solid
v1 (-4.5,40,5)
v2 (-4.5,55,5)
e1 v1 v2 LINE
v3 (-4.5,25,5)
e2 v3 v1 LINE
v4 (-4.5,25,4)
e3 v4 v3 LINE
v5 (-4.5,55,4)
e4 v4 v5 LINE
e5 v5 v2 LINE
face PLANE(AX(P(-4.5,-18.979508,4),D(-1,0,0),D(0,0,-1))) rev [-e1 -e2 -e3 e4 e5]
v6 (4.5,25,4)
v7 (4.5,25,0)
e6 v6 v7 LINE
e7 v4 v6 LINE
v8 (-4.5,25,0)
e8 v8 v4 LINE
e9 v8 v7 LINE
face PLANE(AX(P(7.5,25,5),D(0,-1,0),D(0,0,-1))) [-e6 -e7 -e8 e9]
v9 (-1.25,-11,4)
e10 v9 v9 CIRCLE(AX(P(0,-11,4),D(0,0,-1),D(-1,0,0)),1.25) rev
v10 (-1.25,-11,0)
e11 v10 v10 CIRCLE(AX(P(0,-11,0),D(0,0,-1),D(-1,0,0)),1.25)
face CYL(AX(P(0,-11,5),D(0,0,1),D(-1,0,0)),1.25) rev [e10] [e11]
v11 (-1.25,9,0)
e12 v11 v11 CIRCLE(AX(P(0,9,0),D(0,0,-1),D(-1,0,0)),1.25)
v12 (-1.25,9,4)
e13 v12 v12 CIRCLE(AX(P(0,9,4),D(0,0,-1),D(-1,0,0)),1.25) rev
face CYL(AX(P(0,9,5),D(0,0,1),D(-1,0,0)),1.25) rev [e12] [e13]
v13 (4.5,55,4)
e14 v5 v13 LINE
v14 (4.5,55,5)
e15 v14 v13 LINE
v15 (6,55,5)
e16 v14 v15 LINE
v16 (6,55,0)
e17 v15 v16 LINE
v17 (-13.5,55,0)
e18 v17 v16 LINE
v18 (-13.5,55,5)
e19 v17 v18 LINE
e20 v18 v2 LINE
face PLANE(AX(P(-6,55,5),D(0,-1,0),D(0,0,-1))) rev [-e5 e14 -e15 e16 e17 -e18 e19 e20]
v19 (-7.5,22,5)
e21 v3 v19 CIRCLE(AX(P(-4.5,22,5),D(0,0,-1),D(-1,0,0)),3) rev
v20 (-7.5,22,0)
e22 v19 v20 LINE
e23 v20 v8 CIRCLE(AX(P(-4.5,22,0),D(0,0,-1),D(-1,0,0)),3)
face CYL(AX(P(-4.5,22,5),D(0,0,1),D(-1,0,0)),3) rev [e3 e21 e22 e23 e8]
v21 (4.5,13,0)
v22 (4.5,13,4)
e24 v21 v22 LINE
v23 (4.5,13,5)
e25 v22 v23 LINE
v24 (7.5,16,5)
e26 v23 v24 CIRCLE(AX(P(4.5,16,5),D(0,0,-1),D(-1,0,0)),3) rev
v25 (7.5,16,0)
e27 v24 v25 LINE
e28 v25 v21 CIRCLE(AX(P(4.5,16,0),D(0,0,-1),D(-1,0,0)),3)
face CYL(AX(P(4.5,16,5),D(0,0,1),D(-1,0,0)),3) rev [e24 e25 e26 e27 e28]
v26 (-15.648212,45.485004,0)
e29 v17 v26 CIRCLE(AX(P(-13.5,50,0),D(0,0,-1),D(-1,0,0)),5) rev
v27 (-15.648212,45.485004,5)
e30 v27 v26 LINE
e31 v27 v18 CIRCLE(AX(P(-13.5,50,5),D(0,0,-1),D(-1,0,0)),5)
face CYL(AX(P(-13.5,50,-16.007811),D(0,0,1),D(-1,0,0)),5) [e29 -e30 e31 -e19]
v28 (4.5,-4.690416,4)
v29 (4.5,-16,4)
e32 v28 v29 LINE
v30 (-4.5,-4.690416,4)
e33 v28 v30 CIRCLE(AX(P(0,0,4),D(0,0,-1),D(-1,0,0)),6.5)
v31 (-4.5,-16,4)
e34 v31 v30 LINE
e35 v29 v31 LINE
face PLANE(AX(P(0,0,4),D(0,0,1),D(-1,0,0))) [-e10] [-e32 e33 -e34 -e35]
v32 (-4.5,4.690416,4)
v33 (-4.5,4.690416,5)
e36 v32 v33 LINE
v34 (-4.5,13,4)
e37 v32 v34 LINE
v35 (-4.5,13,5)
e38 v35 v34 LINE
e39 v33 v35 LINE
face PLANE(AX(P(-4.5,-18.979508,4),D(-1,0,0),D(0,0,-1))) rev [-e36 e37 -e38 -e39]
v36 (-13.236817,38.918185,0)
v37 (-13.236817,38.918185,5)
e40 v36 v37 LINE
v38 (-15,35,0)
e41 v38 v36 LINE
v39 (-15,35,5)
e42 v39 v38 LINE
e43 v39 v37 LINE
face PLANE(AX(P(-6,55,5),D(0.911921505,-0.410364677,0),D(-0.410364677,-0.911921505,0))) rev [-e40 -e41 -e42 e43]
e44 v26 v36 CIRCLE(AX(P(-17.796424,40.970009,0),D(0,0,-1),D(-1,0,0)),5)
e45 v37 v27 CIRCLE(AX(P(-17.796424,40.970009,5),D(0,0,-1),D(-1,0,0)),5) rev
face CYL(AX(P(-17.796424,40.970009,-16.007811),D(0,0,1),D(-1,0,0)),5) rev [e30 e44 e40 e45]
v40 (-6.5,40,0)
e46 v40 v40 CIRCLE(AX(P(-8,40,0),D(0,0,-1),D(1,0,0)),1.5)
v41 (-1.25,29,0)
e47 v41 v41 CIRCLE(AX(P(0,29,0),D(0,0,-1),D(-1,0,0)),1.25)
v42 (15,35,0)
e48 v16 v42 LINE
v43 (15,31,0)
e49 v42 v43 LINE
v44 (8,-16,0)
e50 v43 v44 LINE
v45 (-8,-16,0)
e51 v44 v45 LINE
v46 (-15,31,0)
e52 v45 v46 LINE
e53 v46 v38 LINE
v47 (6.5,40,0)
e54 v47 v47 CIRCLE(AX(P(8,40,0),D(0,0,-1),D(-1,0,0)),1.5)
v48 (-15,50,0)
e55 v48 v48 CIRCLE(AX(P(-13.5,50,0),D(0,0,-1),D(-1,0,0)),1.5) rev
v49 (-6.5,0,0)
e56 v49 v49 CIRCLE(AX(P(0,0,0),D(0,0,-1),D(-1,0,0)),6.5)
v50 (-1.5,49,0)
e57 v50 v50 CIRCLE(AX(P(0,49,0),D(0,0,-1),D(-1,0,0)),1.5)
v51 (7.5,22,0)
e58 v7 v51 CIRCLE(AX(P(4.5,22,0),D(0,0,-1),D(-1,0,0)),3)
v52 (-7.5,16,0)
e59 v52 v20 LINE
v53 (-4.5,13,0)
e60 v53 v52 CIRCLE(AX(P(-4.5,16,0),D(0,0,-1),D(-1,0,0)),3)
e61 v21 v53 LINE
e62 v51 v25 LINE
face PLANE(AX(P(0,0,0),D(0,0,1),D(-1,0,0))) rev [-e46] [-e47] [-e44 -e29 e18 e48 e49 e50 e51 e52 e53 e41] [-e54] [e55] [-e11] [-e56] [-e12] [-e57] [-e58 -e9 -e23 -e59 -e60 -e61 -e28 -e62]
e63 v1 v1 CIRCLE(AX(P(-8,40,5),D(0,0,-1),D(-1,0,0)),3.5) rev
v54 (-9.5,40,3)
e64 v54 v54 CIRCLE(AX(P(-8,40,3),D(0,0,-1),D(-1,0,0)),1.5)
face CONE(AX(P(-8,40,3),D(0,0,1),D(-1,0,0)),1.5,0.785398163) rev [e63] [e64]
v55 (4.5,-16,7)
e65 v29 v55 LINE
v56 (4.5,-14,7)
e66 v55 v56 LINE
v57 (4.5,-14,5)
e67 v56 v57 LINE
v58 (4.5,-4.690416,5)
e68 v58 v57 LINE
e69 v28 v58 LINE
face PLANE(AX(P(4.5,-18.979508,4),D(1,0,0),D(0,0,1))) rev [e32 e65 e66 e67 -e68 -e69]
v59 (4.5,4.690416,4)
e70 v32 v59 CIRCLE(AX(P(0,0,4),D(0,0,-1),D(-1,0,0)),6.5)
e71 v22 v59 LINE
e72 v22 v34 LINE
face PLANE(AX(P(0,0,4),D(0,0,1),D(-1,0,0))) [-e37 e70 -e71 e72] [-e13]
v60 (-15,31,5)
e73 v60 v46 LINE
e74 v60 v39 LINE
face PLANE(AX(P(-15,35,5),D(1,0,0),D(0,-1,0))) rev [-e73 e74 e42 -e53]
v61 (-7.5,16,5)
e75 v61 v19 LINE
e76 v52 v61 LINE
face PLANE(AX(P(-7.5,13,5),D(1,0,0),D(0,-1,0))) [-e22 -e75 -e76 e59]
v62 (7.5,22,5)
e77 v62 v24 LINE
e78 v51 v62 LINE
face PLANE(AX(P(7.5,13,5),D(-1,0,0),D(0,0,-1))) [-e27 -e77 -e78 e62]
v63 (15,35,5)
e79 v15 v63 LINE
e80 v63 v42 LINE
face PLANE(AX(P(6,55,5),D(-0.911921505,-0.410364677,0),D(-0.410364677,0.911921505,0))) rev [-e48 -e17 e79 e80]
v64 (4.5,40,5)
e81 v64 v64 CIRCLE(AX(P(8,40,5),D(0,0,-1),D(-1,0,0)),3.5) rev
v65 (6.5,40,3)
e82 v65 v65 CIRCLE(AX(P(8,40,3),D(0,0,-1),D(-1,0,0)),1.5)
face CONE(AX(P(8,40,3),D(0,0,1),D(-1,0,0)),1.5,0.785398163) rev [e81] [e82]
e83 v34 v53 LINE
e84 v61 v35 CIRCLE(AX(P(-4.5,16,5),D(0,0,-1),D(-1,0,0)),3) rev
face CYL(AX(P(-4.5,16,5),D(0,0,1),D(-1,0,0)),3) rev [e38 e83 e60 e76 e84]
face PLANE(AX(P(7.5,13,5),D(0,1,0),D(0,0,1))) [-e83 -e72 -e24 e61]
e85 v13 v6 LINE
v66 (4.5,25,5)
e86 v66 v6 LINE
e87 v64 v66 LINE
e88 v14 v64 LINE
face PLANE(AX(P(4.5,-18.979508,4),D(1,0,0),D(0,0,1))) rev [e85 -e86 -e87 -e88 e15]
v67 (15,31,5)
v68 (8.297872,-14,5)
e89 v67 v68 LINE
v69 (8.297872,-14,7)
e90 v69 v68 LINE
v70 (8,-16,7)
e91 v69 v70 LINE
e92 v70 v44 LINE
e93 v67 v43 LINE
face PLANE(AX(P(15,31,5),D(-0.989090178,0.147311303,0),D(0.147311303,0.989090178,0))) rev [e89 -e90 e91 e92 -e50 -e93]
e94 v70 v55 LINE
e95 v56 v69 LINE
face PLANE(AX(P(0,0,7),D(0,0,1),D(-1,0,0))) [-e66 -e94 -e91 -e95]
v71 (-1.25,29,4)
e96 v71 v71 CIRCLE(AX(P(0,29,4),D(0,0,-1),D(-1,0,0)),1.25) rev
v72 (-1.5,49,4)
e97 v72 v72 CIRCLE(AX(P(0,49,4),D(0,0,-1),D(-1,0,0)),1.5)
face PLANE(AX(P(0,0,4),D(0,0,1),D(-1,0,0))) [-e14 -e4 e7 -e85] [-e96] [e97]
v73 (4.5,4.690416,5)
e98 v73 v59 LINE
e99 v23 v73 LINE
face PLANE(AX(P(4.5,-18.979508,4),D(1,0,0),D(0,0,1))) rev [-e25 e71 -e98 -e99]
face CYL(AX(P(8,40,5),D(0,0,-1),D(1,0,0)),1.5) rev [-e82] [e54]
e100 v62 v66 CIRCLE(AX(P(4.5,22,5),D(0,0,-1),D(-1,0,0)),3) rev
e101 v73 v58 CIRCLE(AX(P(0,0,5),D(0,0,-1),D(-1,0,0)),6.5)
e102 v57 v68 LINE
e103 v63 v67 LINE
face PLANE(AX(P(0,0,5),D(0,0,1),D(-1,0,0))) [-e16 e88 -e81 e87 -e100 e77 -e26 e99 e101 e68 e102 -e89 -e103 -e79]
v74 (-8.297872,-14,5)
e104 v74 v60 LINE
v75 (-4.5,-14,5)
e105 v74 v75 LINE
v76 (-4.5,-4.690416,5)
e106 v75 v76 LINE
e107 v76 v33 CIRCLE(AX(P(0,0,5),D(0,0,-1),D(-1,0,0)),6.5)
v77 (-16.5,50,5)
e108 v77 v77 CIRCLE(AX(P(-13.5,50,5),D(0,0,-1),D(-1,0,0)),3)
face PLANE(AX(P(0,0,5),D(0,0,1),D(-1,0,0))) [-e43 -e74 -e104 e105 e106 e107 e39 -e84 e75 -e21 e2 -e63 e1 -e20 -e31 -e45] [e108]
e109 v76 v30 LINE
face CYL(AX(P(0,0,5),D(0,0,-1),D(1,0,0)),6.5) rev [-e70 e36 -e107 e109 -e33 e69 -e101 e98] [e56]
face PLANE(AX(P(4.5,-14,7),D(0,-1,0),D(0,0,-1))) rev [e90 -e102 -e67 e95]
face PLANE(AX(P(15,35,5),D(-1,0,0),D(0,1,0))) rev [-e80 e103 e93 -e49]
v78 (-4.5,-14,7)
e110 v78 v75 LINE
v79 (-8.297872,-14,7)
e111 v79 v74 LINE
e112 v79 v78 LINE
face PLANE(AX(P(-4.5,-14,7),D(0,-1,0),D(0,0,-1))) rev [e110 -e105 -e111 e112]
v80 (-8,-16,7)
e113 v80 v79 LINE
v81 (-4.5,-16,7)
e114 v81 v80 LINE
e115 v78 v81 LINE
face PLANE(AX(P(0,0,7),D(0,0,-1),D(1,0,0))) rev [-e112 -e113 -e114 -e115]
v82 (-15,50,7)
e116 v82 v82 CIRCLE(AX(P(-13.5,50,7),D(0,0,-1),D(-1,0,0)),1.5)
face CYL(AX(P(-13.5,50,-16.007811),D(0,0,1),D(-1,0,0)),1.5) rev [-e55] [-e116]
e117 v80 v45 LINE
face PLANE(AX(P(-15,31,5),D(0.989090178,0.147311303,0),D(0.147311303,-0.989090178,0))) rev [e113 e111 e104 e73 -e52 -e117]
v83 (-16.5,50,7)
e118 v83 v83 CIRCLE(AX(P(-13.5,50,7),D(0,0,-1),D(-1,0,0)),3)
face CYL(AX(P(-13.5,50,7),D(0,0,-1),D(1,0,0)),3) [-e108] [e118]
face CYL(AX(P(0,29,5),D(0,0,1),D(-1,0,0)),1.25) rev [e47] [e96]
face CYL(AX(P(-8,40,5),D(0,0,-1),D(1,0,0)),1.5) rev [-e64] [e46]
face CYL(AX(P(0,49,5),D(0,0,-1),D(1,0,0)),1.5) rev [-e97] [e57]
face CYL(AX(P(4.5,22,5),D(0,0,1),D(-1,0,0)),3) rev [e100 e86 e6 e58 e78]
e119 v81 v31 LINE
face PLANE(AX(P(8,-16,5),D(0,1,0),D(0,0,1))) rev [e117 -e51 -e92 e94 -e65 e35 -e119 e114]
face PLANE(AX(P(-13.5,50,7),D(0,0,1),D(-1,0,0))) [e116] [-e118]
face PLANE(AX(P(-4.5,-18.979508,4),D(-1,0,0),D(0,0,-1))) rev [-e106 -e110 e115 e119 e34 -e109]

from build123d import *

# Parameters (mm, degrees)
SKETCH_1_R          = 6.5
SKETCH_1_R_2        = 1.5
SKETCH_1_W          = 15
SKETCH_1_H          = 12
EXTRUDE_1_DEPTH     = 5
HOLE_WIZARD_M3_1_D  = 2.5
SKETCH_2_W          = 9
SKETCH_2_H          = 83.78955867
CUT_EXTRUDE_1_DEPTH = 1
FILLET_1_R          = 3
EXTRUDE_2_DEPTH     = 2
CHAMFER_1_SIZE      = 2
SKETCH_5_R          = 1.5
EXTRUDE_4_DEPTH     = 5
FILLET_2_R          = 5
EXTRUDE_START       = 2
SKETCH_6_R          = 3
SKETCH_6_R_2        = 1.5
EXTRUDE_5_DEPTH     = 2


with BuildPart() as part:
    # 草图1 → 凸台-拉伸1 (new body)
    with BuildSketch(Plane.XY):
        Polygon((6, 55), (-6, 55), (-15, 35), (-15, 31), (-8, -16), (8, -16), (15, 31), (15, 35), align=None)
        Circle(SKETCH_1_R, mode=Mode.SUBTRACT)
        with Locations((0, 49)):
            Circle(SKETCH_1_R_2, mode=Mode.SUBTRACT)
        with Locations((-8, 40)):
            Circle(SKETCH_1_R_2, mode=Mode.SUBTRACT)
        with Locations(Location((8, 40, 0), (0, 0, 180))):
            Circle(SKETCH_1_R_2, mode=Mode.SUBTRACT)
        with Locations((0, 19)):
            Rectangle(SKETCH_1_W, SKETCH_1_H, mode=Mode.SUBTRACT)
    extrude(amount=EXTRUDE_1_DEPTH)

    # M3 螺纹孔1 (through all)
    with Locations(Plane.XY.offset(5)):
        with Locations((0, 29), (0, 9), (0, -11)):
            Hole(HOLE_WIZARD_M3_1_D / 2)

    # 草图2 → 切除-拉伸1 (cut)
    with BuildSketch(Plane.XY.offset(5)):
        with Locations((0, 22.915271632)):
            Rectangle(SKETCH_2_W, SKETCH_2_H)
    extrude(amount=-CUT_EXTRUDE_1_DEPTH, mode=Mode.SUBTRACT)

    # 圆角1
    fillet_1_edges = [part.edges().sort_by_distance(p)[0] for p in [
        (7.5, 13, 2.5),
        (-7.5, 13, 2.5),
        (-7.5, 25, 2.5),
        (7.5, 25, 2.5),
    ]]
    fillet(fillet_1_edges, radius=FILLET_1_R)

    # 草图4 → 凸台-拉伸2 (add)
    with BuildSketch(Plane.XY.offset(5)):
        Polygon((-8, -16), (-4.5, -16), (-4.5, -14), (-8.29787234, -14), align=None)
        Polygon((4.5, -14), (8.29787234, -14), (8, -16), (4.5, -16), align=None)
    extrude(amount=EXTRUDE_2_DEPTH)

    # 倒角1
    chamfer_1_edges = [part.edges().sort_by_distance(p)[0] for p in [
        (-9.5, 40, 5),
        (9.5, 40, 5),
    ]]
    chamfer(chamfer_1_edges, length=CHAMFER_1_SIZE - 0.0001)  # a hair under: the kernel refuses the full size

    # 草图5 → 凸台-拉伸4 (add)
    with BuildSketch(Plane.XY.offset(5)):
        with BuildLine():
            Line((6, 55), (13.5, 55))
            ThreePointArc((13.5, 55), (18.049597051, 47.926074574), (9.725789999, 46.720466669))
            Line((9.725789999, 46.720466669), (6, 55))
        make_face()
        with Locations((13.5, 50)):
            Circle(SKETCH_5_R, mode=Mode.SUBTRACT)
    extrude(amount=-EXTRUDE_4_DEPTH)

    # 圆角2
    fillet_2_edges = [part.edges().sort_by_distance(p)[0] for p in [
        (9.725789999, 46.720466669, 2.5),
    ]]
    fillet(fillet_2_edges, radius=FILLET_2_R)

    # 草图6 → 凸台-拉伸5 (add)
    with BuildSketch(Plane.XY.offset(5).offset(EXTRUDE_START)):
        with Locations((13.5, 50)):
            Circle(SKETCH_6_R)
        with Locations((13.5, 50)):
            Circle(SKETCH_6_R_2, mode=Mode.SUBTRACT)
    extrude(amount=-EXTRUDE_5_DEPTH)


with BuildPart() as body_2:
    # 镜向1: mirrored copy
    add(part.part.mirror(Plane(origin=(0, 0, 0), x_dir=(0, 0, 1), z_dir=(1, 0, 0))))


solid = body_2.part
